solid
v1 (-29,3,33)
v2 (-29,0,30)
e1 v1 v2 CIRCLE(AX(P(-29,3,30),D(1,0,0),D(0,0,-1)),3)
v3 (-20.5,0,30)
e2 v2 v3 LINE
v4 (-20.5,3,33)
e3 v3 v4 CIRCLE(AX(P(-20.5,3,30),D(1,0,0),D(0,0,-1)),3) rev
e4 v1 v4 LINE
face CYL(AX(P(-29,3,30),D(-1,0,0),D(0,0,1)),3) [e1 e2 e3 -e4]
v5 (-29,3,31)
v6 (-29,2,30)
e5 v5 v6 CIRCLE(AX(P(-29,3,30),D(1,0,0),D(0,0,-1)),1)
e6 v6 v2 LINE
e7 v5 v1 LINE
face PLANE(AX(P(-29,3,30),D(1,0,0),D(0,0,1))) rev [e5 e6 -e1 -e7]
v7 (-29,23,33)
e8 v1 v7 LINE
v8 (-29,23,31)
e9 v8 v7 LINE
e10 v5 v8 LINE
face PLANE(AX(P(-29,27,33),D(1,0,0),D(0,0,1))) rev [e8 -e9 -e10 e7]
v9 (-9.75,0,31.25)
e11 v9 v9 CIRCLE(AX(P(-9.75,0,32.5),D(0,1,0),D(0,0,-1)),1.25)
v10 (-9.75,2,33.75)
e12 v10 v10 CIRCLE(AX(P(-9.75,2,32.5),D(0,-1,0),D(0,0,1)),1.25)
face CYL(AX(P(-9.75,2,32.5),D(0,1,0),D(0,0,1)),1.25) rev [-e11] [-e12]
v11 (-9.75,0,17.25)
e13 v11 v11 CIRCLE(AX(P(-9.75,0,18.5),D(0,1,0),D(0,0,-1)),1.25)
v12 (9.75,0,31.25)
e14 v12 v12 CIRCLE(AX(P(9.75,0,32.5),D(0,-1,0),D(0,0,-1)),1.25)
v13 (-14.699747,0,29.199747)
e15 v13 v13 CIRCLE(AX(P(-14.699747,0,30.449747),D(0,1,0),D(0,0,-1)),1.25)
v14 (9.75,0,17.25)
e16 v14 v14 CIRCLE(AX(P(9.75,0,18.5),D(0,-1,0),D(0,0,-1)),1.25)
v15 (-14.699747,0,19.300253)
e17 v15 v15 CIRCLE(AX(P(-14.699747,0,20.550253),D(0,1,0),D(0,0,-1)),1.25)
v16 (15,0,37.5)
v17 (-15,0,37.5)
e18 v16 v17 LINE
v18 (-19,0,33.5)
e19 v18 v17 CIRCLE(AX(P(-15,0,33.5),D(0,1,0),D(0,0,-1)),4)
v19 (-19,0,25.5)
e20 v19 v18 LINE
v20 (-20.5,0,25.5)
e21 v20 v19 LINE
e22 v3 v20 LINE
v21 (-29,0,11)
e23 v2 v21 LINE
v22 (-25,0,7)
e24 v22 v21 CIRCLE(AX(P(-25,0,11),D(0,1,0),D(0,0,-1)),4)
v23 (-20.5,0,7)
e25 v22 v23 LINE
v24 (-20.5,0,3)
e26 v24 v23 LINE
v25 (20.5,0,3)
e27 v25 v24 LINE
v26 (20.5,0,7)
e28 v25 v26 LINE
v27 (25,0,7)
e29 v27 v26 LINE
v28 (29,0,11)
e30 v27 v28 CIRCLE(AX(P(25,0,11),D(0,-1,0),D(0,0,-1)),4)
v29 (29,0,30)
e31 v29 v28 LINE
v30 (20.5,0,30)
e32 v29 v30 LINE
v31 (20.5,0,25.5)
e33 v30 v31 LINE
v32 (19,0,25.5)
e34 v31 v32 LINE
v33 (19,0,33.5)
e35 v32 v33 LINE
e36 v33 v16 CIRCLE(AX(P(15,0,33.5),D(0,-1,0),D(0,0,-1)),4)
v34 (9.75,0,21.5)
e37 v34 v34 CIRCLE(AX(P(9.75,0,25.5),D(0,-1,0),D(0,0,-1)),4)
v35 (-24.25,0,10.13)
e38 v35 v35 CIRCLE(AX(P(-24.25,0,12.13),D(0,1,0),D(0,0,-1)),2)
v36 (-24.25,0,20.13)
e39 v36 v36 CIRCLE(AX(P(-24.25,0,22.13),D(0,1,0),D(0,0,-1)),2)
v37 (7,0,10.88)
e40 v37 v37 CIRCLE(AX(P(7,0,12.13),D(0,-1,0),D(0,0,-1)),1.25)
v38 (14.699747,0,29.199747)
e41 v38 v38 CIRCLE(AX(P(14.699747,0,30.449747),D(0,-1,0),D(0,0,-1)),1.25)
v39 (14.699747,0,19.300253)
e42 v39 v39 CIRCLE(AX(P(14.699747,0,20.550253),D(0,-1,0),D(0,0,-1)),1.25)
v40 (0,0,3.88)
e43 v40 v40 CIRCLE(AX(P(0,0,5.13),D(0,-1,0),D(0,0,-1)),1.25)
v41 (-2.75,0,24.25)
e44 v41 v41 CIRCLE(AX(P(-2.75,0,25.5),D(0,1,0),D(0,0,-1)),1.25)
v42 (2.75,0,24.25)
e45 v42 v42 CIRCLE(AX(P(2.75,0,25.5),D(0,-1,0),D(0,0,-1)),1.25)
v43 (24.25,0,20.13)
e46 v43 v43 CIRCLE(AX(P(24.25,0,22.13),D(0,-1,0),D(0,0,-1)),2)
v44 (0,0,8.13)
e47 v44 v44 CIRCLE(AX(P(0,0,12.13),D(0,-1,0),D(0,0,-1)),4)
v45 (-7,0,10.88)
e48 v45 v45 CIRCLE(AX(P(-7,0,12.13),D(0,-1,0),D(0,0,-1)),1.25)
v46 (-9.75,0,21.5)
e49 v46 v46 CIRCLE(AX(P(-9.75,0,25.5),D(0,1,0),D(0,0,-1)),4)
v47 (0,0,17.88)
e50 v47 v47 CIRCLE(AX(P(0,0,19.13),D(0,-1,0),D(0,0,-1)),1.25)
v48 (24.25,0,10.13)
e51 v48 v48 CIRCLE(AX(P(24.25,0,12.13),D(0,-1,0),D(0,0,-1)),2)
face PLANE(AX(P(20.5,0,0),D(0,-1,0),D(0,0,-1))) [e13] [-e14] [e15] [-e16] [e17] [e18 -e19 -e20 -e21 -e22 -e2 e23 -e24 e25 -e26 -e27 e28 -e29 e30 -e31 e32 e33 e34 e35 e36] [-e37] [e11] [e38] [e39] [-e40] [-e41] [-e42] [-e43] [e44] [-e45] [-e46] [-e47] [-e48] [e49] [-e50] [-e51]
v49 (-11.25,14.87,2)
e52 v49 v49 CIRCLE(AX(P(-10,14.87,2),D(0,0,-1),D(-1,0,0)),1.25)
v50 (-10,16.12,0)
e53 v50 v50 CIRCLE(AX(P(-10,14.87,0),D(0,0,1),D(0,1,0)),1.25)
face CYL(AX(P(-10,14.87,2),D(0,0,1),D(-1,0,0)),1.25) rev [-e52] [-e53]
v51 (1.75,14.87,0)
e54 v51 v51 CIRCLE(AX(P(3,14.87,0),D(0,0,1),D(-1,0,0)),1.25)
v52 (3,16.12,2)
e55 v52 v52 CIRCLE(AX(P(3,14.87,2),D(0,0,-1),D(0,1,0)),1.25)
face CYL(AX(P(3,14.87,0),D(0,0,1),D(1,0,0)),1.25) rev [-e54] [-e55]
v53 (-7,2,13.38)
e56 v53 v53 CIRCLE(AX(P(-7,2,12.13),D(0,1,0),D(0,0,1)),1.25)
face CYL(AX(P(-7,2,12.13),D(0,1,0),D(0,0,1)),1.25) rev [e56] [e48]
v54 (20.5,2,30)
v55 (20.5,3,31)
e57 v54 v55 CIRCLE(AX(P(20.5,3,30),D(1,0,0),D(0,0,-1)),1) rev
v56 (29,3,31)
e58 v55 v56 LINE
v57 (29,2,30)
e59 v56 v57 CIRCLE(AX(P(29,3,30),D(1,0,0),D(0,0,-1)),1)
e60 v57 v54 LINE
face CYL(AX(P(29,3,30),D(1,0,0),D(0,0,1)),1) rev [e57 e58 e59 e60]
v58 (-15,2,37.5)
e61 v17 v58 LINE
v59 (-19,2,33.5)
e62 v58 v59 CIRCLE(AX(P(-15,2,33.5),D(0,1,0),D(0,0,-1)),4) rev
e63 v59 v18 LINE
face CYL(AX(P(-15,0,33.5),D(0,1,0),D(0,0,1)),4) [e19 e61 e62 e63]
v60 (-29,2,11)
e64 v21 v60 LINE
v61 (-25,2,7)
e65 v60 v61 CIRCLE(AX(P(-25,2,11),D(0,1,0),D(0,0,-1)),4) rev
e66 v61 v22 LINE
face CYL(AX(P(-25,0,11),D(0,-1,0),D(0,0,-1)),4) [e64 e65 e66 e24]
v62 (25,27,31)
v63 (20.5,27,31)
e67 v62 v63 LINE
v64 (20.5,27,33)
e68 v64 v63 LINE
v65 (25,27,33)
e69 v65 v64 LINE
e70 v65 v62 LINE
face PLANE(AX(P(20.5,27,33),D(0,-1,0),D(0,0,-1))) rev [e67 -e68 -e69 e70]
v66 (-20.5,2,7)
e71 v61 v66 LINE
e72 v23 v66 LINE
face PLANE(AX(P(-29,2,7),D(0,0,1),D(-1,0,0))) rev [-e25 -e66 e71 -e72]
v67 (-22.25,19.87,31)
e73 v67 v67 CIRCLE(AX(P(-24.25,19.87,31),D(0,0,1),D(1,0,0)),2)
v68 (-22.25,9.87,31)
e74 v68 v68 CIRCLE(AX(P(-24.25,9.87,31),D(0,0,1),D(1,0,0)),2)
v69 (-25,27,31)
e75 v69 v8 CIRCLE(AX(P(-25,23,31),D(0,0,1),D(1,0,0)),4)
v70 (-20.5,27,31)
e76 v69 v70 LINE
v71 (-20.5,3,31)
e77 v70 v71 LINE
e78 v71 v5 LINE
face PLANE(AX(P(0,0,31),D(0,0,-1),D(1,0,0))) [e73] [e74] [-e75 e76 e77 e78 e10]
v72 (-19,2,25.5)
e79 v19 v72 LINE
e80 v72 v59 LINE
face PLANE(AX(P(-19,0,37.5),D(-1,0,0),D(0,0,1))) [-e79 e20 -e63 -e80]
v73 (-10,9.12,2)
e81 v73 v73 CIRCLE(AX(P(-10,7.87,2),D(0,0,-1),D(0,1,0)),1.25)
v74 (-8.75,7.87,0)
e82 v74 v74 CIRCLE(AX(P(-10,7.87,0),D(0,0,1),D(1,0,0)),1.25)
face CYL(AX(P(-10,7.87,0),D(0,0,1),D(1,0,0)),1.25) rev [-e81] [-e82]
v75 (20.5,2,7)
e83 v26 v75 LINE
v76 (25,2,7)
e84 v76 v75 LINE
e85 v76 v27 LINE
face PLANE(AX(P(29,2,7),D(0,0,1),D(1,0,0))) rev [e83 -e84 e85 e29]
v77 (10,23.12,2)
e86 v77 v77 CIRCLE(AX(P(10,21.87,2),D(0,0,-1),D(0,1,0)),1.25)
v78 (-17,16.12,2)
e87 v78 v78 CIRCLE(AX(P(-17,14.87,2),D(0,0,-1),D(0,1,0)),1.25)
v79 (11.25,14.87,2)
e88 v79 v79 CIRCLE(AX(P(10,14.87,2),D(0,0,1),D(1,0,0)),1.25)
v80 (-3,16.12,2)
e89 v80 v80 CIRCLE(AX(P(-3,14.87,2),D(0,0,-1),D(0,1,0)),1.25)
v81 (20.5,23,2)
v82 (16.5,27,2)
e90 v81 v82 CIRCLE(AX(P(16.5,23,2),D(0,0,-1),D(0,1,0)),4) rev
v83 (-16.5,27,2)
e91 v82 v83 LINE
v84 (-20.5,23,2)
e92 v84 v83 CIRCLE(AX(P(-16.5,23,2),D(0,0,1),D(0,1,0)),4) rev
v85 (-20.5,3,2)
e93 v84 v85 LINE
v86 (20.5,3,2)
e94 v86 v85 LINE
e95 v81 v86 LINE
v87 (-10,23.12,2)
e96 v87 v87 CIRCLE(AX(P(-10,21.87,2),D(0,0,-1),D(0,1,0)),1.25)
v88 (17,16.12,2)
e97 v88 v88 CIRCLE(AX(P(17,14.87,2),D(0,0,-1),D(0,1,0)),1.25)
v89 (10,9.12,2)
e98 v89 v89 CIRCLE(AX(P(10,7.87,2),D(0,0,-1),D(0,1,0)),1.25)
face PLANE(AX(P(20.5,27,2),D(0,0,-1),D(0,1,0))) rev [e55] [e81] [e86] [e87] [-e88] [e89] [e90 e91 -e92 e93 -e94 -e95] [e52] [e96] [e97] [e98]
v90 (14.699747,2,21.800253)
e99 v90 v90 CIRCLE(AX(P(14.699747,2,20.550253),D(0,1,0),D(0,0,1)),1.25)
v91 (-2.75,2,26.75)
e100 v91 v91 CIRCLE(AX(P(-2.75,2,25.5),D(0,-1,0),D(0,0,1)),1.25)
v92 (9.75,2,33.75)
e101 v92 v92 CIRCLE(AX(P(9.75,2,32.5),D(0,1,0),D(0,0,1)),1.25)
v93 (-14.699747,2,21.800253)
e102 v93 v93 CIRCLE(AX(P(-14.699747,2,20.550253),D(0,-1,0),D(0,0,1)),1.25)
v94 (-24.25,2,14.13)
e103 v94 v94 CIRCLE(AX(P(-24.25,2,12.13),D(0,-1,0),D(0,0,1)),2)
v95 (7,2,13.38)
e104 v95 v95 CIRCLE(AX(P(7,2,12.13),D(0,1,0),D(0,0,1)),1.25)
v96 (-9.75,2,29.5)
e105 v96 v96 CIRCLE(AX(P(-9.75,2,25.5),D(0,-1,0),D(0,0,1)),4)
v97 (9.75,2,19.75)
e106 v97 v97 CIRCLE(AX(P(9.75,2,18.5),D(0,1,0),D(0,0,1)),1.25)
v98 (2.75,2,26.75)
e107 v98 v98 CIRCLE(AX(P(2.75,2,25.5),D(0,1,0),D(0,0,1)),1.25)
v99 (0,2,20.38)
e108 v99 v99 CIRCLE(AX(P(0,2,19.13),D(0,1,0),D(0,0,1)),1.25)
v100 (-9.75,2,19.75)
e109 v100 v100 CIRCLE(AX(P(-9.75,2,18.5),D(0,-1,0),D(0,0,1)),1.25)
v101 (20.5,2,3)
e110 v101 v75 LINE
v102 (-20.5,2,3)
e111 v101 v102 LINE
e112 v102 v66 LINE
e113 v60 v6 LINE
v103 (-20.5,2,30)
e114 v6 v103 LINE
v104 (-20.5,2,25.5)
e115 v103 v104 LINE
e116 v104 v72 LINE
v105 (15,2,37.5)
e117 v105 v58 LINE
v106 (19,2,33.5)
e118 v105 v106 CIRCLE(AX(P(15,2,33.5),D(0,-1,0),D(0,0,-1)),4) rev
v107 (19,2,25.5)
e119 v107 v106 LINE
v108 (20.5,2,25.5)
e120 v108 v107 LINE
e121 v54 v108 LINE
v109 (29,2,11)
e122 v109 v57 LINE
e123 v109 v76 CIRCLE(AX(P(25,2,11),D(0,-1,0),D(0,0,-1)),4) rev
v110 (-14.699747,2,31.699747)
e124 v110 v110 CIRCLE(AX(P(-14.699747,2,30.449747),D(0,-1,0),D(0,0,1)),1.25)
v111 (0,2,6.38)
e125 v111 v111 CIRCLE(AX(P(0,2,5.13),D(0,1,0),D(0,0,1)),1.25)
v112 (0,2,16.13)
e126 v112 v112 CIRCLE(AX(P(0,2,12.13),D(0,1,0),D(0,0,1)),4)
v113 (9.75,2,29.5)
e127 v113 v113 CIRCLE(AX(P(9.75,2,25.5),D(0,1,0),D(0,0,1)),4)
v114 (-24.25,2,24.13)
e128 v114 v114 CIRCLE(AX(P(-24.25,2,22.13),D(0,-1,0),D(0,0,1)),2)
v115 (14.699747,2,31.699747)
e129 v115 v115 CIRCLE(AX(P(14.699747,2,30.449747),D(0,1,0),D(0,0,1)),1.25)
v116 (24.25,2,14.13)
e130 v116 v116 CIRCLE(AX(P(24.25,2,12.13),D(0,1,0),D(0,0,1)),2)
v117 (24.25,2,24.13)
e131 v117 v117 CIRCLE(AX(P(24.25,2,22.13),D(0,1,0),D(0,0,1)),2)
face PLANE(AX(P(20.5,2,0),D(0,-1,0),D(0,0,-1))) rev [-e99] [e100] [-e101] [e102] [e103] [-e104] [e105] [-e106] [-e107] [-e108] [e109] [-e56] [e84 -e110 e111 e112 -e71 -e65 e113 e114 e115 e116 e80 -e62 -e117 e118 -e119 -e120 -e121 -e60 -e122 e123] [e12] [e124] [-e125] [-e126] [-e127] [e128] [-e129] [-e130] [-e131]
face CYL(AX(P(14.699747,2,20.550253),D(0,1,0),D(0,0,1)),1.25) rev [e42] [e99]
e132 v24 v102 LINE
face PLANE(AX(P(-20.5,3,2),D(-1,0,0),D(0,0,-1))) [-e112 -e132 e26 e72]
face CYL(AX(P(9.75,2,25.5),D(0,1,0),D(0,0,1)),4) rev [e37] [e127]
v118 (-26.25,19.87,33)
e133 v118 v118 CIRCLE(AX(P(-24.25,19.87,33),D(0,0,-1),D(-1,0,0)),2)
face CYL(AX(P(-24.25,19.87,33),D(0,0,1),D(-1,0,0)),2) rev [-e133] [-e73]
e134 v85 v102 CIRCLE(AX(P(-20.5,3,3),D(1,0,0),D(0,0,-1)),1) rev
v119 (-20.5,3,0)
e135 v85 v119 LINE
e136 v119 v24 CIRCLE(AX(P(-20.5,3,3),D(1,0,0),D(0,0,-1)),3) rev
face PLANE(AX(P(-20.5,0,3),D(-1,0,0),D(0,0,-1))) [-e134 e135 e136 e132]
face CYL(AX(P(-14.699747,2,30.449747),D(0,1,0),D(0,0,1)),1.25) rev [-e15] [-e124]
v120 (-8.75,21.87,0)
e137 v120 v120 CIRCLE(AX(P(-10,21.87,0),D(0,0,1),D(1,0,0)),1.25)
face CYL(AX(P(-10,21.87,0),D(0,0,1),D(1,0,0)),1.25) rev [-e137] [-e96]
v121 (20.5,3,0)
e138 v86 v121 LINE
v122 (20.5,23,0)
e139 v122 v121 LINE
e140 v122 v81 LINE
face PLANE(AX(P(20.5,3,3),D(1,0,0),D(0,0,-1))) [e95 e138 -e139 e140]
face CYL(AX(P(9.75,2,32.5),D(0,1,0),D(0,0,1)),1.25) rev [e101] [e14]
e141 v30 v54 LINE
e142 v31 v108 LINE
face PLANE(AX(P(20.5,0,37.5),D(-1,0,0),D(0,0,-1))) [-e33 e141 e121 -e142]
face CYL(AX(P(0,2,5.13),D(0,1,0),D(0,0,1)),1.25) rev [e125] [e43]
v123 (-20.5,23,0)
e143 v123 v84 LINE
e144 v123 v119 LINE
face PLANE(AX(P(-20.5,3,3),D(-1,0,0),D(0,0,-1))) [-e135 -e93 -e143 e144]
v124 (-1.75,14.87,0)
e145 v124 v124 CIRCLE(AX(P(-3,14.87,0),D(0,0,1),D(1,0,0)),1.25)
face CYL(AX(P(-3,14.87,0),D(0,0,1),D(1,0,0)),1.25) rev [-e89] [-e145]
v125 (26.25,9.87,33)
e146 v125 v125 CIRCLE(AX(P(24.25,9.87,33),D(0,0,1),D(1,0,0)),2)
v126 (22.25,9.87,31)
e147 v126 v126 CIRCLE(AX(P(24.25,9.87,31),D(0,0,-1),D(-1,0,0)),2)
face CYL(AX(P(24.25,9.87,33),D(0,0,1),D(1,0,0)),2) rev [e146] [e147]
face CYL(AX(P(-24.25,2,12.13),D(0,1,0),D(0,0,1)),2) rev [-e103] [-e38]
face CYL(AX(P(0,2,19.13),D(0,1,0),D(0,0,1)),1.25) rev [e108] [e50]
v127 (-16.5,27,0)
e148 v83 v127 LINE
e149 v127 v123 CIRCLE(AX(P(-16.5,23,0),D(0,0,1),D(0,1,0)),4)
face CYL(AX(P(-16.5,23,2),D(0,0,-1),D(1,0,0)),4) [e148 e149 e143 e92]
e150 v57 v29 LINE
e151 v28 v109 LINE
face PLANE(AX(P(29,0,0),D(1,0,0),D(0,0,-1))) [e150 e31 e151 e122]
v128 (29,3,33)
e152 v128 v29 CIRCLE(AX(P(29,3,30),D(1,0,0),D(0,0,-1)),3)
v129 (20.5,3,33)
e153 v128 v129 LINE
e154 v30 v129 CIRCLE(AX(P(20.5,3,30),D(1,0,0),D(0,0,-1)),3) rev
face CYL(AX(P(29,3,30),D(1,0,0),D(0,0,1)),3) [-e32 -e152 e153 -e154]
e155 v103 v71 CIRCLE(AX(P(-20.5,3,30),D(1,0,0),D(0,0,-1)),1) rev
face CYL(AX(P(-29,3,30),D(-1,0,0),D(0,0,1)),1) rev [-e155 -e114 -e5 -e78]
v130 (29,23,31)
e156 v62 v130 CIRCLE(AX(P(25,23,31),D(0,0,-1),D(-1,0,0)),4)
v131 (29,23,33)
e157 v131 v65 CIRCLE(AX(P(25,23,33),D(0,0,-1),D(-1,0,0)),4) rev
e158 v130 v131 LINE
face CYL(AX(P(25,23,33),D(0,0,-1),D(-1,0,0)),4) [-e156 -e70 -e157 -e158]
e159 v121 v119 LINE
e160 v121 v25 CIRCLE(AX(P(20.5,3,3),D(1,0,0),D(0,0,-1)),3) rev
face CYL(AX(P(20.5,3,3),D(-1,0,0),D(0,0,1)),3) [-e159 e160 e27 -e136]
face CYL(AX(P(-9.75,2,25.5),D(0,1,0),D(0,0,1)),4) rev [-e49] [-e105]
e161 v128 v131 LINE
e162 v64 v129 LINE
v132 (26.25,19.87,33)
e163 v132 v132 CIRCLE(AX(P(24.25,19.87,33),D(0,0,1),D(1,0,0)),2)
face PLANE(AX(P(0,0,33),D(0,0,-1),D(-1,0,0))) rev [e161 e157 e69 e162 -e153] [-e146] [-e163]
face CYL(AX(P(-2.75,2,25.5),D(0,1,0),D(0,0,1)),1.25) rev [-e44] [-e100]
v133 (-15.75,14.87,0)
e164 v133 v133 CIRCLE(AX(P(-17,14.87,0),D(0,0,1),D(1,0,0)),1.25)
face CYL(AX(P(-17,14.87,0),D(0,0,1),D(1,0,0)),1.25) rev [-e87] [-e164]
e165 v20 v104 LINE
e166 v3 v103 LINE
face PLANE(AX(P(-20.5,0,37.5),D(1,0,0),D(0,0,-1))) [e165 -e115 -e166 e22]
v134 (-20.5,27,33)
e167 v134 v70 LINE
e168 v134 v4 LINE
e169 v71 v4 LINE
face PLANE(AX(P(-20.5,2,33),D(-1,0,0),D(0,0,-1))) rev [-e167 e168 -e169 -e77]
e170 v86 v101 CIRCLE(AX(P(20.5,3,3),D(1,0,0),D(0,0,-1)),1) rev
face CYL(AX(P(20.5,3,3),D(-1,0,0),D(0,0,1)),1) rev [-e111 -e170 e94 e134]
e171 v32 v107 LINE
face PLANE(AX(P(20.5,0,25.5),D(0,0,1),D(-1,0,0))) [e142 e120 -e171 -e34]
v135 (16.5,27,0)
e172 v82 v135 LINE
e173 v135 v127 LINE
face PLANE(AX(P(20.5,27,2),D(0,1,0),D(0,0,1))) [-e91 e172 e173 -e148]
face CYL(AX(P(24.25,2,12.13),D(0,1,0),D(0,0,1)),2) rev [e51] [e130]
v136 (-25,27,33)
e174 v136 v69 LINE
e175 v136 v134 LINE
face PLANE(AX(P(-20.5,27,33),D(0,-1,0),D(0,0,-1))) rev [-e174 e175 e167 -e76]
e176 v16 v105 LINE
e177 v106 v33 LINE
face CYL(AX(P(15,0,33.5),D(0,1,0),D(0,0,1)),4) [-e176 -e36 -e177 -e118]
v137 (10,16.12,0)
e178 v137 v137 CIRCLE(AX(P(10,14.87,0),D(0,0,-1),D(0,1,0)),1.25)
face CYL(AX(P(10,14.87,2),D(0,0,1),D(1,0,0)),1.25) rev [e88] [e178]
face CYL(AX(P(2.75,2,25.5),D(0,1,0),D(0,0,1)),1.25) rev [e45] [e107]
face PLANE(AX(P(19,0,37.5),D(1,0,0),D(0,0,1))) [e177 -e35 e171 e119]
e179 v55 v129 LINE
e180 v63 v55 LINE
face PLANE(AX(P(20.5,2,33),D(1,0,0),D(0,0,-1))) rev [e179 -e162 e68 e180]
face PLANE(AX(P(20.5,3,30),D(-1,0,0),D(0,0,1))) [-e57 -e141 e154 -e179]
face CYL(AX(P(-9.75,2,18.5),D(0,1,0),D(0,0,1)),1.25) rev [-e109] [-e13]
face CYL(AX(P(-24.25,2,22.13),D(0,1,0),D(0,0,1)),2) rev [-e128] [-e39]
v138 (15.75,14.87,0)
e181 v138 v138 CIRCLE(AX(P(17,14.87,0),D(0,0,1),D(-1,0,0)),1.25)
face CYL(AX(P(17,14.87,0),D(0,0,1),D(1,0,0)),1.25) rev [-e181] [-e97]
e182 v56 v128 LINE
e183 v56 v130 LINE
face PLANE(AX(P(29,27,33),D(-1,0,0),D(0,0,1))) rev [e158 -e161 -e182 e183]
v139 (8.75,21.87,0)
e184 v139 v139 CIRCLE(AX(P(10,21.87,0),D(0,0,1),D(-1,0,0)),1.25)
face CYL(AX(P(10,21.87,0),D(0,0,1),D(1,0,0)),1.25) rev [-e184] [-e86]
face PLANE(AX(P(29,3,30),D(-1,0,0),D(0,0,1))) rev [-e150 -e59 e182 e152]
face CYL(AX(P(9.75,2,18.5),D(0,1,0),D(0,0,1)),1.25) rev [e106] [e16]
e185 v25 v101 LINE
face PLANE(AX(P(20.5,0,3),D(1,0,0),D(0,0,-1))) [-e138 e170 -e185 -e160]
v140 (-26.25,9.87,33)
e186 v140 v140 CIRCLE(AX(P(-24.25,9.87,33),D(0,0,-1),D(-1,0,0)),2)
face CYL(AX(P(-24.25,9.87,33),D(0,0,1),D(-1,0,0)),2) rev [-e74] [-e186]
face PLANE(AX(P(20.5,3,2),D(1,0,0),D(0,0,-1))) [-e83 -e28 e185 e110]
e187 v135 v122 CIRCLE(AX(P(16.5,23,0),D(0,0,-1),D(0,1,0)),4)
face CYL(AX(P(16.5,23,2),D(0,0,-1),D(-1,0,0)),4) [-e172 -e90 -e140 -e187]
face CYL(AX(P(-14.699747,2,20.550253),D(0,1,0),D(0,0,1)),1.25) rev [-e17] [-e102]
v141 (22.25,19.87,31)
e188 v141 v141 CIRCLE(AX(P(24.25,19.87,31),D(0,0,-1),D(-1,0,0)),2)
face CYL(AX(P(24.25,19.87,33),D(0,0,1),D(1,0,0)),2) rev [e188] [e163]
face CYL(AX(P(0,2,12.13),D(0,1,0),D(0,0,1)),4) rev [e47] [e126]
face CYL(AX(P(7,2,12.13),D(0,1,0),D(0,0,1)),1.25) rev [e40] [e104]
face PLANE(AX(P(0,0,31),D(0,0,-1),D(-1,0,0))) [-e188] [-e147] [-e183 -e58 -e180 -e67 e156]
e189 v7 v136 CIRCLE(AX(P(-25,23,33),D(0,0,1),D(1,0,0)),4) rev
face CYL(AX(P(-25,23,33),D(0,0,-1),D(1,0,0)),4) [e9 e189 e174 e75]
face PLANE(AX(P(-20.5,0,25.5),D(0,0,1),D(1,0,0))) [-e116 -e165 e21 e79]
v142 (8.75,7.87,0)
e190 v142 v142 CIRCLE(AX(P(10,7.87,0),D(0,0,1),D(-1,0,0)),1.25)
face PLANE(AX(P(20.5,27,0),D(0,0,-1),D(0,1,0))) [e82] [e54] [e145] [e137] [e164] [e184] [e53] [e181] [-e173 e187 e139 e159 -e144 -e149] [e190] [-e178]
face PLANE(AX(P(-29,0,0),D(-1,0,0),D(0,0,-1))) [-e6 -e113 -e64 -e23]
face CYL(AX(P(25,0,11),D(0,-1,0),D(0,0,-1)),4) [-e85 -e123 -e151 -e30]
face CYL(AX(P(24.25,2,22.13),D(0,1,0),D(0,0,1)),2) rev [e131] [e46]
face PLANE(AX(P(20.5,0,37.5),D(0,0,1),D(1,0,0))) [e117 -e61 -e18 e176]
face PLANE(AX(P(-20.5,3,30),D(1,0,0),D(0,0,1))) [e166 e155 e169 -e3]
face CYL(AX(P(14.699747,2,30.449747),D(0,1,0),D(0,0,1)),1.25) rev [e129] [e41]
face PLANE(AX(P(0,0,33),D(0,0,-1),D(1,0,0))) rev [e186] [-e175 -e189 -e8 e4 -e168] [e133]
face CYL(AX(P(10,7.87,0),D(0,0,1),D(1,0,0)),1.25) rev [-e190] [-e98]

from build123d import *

# Parameters (mm, degrees)
T_LE_DE_BASE_PLI_E1_DEPTH             = 20.5
ESQUISSE8_W                           = 24
ESQUISSE8_H                           = 2
BOSS_EXTRU_1_DEPTH                    = 8.5
T_LE_PLI_E_SUR_AR_TE1_STRIP_W         = 10
T_LE_PLI_E_SUR_AR_TE1_STRIP_H         = 2
T_LE_PLI_E_SUR_AR_TE1_STRIP_CUT_DEPTH = 8.5
T_LE_PLI_E_SUR_AR_TE1_DEPTH           = 8.5
ESQUISSE12_W                          = 1.5
ESQUISSE12_H                          = 12
ENL_V_MAT_EXTRU_1_DEPTH               = 8.5
DIAM_TRE_DU_PER_AGE_4_0_4_1_D         = 4
DIAM_TRE_DU_PER_AGE_8_0_8_1_D         = 8
DIAM_TRE_DU_PER_AGE_2_5_2_5_1_D       = 2.5
R_P_TITION_CIRCULAIRE1_COUNT          = 8
DIAM_TRE_DU_PER_AGE_4_0_4_2_D         = 4
DIAM_TRE_DU_PER_AGE_2_5_2_5_2_D       = 2.5
CONG_1_R                              = 4
DIAM_TRE_DU_PER_AGE_8_0_8_2_D         = 8
DIAM_TRE_DU_PER_AGE_2_5_2_5_3_D       = 2.5
R_P_TITION_CIRCULAIRE2_COUNT          = 4
CUT_EXTRUDE1_DEPTH                    = 54.200093985
CUT_EXTRUDE1_DEPTH_BACK               = 54.200093985
SKETCH1_R                             = 1.25


# Sheet-metal steps are written as plain solids
with BuildPart() as part:
    # Esquisse1 → Tôle de base pliée1 (new body)
    with BuildSketch(Plane(origin=(0, 0, 0), x_dir=(0, 0, -1), z_dir=(1, 0, 0))):
        with BuildLine():
            Line((0, 27), (0, 3))
            ThreePointArc((0, 3), (-0.878679656, 0.878679656), (-3, 0))
            Line((-3, 0), (-37.5, 0))
            Line((-37.5, 0), (-37.5, 2))
            Line((-37.5, 2), (-3, 2))
            ThreePointArc((-3, 2), (-2.292893219, 2.292893219), (-2, 3))
            Line((-2, 3), (-2, 27))
            Line((-2, 27), (0, 27))
        make_face()
    extrude(amount=T_LE_DE_BASE_PLI_E1_DEPTH)

    # Esquisse8 → Boss.-Extru.1 (add)
    with BuildSketch(Plane(origin=(20.5, 0, 0), x_dir=(0, 0, -1), z_dir=(1, 0, 0))):
        with Locations((-19, 1)):
            Rectangle(ESQUISSE8_W, ESQUISSE8_H)
    extrude(amount=BOSS_EXTRU_1_DEPTH)

    # Tôle pliée sur arête1 strip (across the edge) → Tôle pliée sur arête1 strip cut (cut)
    with BuildSketch(Plane(origin=(20.5, 2, 31), x_dir=(0, 0, -1), z_dir=(1, 0, 0))):
        with Locations((-4, -1)):
            Rectangle(T_LE_PLI_E_SUR_AR_TE1_STRIP_W, T_LE_PLI_E_SUR_AR_TE1_STRIP_H)
    extrude(amount=T_LE_PLI_E_SUR_AR_TE1_STRIP_CUT_DEPTH, mode=Mode.SUBTRACT)

    # Tôle pliée sur arête1 section (across the edge) → Tôle pliée sur arête1 (add)
    with BuildSketch(Plane(origin=(20.5, 2, 31), x_dir=(0, 0, -1), z_dir=(1, 0, 0))):
        with BuildLine():
            Line((-2, 1), (-2, 25))
            Line((-2, 25), (0, 25))
            Line((0, 25), (0, 1))
            ThreePointArc((0, 1), (0.292893219, 0.292893219), (1, 0))
            Line((1, 0), (1, -2))
            ThreePointArc((1, -2), (-1.121320344, -1.121320344), (-2, 1))
        make_face()
    extrude(amount=T_LE_PLI_E_SUR_AR_TE1_DEPTH)

    # Esquisse12 → Enlèv. mat.-Extru.1 (cut)
    with BuildSketch(Plane(origin=(0, 2, 0), x_dir=(1, 0, 0), z_dir=(0, 1, 0))):
        with Locations((19.75, -31.5)):
            Rectangle(ESQUISSE12_W, ESQUISSE12_H)
    extrude(amount=-ENL_V_MAT_EXTRU_1_DEPTH, mode=Mode.SUBTRACT)

    # Diamètre du perçage Ø4.0 (4)1 (through all)
    with Locations(Plane(origin=(0, 2, 0), x_dir=(1, 0, 0), z_dir=(0, 1, 0))):
        with Locations((24.25, -12.13), (24.25, -22.13)):
            Hole(DIAM_TRE_DU_PER_AGE_4_0_4_1_D / 2)

    # Diamètre du perçage Ø8.0 (8)1 (through all)
    with Locations(Plane(origin=(0, 2, 0), x_dir=(1, 0, 0), z_dir=(0, 1, 0))):
        with Locations((9.75, -25.5)):
            Hole(DIAM_TRE_DU_PER_AGE_8_0_8_1_D / 2)

    # Diamètre du perçage Ø2.5 (2.5)1 (through all)
    with Locations(Plane(origin=(0, 2, 0), x_dir=(1, 0, 0), z_dir=(0, 1, 0))):
        with Locations((9.75, -18.5)):
            diam_tre_du_per_age_2_5_2_5_1 = Hole(DIAM_TRE_DU_PER_AGE_2_5_2_5_1_D / 2)

    # Répétition circulaire1: Diamètre du perçage Ø2.5 (2.5)1 ×8 about axis, 3 skipped
    r_p_tition_circulaire1_axis = Axis((9.75, 2, 25.5), (0, 1, 0))
    add([diam_tre_du_per_age_2_5_2_5_1.rotate(r_p_tition_circulaire1_axis, i * 360 / R_P_TITION_CIRCULAIRE1_COUNT) for i in range(1, R_P_TITION_CIRCULAIRE1_COUNT) if i not in (1, 3, 6)], mode=Mode.SUBTRACT)

    # Diamètre du perçage Ø4.0 (4)2 (through all)
    with Locations(Plane.XY.offset(33)):
        with Locations((24.25, 19.87), (24.25, 9.87)):
            Hole(DIAM_TRE_DU_PER_AGE_4_0_4_2_D / 2)

    # Diamètre du perçage Ø2.5 (2.5)2 (through all)
    with Locations(Plane.XY.offset(2)):
        with Locations((10, 14.87)):
            Hole(DIAM_TRE_DU_PER_AGE_2_5_2_5_2_D / 2)

    # Congé1
    cong_1_edges = [part.edges().sort_by_distance(p)[0] for p in [
        (20.5, 27, 1),
        (29, 1, 7),
        (29, 27, 32),
        (19, 1, 37.5),
    ]]
    fillet(cong_1_edges, radius=CONG_1_R)

    # Symétrie1: part across plane


with BuildPart() as part_1:
    add(part.part)
    add(part.part.mirror(Plane(origin=(0, 3, 3), x_dir=(0, 0, 1), z_dir=(1, 0, 0))))

    # Diamètre du perçage Ø8.0 (8)2 (through all)
    with Locations(Plane(origin=(0, 2, 0), x_dir=(1, 0, 0), z_dir=(0, 1, 0))):
        with Locations((0, -12.13)):
            Hole(DIAM_TRE_DU_PER_AGE_8_0_8_2_D / 2)

    # Diamètre du perçage Ø2.5 (2.5)3 (through all)
    with Locations(Plane(origin=(0, 2, 0), x_dir=(1, 0, 0), z_dir=(0, 1, 0))):
        with Locations((0, -5.13)):
            diam_tre_du_per_age_2_5_2_5_3 = Hole(DIAM_TRE_DU_PER_AGE_2_5_2_5_3_D / 2)

    # Répétition circulaire2: Diamètre du perçage Ø2.5 (2.5)3 ×4 about axis
    r_p_tition_circulaire2_axis = Axis((0, 0, 12.13), (0, 1, 0))
    for i in range(1, R_P_TITION_CIRCULAIRE2_COUNT):
        add(diam_tre_du_per_age_2_5_2_5_3.rotate(r_p_tition_circulaire2_axis, i * 360 / R_P_TITION_CIRCULAIRE2_COUNT), mode=Mode.SUBTRACT)

    # Sketch1 → Cut-Extrude1 (cut, two sides: drawn at the far end of the back side and taken through both)
    with BuildSketch(Plane.XY.offset(2).offset(-CUT_EXTRUDE1_DEPTH_BACK)):
        with Locations((-10, 21.87)):
            Circle(SKETCH1_R)
        with Locations((-3, 14.87)):
            Circle(SKETCH1_R)
        with Locations((-10, 7.87)):
            Circle(SKETCH1_R)
        with Locations((-17, 14.87)):
            Circle(SKETCH1_R)
        with Locations(Location((3, 14.87, 0), (0, 0, 90))):
            Circle(SKETCH1_R)
        with Locations(Location((10, 7.87, 0), (0, 0, 90))):
            Circle(SKETCH1_R)
        with Locations(Location((17, 14.87, 0), (0, 0, 90))):
            Circle(SKETCH1_R)
        with Locations(Location((10, 21.87, 0), (0, 0, 90))):
            Circle(SKETCH1_R)
    extrude(amount=CUT_EXTRUDE1_DEPTH + CUT_EXTRUDE1_DEPTH_BACK, mode=Mode.SUBTRACT)


solid = part_1.part
